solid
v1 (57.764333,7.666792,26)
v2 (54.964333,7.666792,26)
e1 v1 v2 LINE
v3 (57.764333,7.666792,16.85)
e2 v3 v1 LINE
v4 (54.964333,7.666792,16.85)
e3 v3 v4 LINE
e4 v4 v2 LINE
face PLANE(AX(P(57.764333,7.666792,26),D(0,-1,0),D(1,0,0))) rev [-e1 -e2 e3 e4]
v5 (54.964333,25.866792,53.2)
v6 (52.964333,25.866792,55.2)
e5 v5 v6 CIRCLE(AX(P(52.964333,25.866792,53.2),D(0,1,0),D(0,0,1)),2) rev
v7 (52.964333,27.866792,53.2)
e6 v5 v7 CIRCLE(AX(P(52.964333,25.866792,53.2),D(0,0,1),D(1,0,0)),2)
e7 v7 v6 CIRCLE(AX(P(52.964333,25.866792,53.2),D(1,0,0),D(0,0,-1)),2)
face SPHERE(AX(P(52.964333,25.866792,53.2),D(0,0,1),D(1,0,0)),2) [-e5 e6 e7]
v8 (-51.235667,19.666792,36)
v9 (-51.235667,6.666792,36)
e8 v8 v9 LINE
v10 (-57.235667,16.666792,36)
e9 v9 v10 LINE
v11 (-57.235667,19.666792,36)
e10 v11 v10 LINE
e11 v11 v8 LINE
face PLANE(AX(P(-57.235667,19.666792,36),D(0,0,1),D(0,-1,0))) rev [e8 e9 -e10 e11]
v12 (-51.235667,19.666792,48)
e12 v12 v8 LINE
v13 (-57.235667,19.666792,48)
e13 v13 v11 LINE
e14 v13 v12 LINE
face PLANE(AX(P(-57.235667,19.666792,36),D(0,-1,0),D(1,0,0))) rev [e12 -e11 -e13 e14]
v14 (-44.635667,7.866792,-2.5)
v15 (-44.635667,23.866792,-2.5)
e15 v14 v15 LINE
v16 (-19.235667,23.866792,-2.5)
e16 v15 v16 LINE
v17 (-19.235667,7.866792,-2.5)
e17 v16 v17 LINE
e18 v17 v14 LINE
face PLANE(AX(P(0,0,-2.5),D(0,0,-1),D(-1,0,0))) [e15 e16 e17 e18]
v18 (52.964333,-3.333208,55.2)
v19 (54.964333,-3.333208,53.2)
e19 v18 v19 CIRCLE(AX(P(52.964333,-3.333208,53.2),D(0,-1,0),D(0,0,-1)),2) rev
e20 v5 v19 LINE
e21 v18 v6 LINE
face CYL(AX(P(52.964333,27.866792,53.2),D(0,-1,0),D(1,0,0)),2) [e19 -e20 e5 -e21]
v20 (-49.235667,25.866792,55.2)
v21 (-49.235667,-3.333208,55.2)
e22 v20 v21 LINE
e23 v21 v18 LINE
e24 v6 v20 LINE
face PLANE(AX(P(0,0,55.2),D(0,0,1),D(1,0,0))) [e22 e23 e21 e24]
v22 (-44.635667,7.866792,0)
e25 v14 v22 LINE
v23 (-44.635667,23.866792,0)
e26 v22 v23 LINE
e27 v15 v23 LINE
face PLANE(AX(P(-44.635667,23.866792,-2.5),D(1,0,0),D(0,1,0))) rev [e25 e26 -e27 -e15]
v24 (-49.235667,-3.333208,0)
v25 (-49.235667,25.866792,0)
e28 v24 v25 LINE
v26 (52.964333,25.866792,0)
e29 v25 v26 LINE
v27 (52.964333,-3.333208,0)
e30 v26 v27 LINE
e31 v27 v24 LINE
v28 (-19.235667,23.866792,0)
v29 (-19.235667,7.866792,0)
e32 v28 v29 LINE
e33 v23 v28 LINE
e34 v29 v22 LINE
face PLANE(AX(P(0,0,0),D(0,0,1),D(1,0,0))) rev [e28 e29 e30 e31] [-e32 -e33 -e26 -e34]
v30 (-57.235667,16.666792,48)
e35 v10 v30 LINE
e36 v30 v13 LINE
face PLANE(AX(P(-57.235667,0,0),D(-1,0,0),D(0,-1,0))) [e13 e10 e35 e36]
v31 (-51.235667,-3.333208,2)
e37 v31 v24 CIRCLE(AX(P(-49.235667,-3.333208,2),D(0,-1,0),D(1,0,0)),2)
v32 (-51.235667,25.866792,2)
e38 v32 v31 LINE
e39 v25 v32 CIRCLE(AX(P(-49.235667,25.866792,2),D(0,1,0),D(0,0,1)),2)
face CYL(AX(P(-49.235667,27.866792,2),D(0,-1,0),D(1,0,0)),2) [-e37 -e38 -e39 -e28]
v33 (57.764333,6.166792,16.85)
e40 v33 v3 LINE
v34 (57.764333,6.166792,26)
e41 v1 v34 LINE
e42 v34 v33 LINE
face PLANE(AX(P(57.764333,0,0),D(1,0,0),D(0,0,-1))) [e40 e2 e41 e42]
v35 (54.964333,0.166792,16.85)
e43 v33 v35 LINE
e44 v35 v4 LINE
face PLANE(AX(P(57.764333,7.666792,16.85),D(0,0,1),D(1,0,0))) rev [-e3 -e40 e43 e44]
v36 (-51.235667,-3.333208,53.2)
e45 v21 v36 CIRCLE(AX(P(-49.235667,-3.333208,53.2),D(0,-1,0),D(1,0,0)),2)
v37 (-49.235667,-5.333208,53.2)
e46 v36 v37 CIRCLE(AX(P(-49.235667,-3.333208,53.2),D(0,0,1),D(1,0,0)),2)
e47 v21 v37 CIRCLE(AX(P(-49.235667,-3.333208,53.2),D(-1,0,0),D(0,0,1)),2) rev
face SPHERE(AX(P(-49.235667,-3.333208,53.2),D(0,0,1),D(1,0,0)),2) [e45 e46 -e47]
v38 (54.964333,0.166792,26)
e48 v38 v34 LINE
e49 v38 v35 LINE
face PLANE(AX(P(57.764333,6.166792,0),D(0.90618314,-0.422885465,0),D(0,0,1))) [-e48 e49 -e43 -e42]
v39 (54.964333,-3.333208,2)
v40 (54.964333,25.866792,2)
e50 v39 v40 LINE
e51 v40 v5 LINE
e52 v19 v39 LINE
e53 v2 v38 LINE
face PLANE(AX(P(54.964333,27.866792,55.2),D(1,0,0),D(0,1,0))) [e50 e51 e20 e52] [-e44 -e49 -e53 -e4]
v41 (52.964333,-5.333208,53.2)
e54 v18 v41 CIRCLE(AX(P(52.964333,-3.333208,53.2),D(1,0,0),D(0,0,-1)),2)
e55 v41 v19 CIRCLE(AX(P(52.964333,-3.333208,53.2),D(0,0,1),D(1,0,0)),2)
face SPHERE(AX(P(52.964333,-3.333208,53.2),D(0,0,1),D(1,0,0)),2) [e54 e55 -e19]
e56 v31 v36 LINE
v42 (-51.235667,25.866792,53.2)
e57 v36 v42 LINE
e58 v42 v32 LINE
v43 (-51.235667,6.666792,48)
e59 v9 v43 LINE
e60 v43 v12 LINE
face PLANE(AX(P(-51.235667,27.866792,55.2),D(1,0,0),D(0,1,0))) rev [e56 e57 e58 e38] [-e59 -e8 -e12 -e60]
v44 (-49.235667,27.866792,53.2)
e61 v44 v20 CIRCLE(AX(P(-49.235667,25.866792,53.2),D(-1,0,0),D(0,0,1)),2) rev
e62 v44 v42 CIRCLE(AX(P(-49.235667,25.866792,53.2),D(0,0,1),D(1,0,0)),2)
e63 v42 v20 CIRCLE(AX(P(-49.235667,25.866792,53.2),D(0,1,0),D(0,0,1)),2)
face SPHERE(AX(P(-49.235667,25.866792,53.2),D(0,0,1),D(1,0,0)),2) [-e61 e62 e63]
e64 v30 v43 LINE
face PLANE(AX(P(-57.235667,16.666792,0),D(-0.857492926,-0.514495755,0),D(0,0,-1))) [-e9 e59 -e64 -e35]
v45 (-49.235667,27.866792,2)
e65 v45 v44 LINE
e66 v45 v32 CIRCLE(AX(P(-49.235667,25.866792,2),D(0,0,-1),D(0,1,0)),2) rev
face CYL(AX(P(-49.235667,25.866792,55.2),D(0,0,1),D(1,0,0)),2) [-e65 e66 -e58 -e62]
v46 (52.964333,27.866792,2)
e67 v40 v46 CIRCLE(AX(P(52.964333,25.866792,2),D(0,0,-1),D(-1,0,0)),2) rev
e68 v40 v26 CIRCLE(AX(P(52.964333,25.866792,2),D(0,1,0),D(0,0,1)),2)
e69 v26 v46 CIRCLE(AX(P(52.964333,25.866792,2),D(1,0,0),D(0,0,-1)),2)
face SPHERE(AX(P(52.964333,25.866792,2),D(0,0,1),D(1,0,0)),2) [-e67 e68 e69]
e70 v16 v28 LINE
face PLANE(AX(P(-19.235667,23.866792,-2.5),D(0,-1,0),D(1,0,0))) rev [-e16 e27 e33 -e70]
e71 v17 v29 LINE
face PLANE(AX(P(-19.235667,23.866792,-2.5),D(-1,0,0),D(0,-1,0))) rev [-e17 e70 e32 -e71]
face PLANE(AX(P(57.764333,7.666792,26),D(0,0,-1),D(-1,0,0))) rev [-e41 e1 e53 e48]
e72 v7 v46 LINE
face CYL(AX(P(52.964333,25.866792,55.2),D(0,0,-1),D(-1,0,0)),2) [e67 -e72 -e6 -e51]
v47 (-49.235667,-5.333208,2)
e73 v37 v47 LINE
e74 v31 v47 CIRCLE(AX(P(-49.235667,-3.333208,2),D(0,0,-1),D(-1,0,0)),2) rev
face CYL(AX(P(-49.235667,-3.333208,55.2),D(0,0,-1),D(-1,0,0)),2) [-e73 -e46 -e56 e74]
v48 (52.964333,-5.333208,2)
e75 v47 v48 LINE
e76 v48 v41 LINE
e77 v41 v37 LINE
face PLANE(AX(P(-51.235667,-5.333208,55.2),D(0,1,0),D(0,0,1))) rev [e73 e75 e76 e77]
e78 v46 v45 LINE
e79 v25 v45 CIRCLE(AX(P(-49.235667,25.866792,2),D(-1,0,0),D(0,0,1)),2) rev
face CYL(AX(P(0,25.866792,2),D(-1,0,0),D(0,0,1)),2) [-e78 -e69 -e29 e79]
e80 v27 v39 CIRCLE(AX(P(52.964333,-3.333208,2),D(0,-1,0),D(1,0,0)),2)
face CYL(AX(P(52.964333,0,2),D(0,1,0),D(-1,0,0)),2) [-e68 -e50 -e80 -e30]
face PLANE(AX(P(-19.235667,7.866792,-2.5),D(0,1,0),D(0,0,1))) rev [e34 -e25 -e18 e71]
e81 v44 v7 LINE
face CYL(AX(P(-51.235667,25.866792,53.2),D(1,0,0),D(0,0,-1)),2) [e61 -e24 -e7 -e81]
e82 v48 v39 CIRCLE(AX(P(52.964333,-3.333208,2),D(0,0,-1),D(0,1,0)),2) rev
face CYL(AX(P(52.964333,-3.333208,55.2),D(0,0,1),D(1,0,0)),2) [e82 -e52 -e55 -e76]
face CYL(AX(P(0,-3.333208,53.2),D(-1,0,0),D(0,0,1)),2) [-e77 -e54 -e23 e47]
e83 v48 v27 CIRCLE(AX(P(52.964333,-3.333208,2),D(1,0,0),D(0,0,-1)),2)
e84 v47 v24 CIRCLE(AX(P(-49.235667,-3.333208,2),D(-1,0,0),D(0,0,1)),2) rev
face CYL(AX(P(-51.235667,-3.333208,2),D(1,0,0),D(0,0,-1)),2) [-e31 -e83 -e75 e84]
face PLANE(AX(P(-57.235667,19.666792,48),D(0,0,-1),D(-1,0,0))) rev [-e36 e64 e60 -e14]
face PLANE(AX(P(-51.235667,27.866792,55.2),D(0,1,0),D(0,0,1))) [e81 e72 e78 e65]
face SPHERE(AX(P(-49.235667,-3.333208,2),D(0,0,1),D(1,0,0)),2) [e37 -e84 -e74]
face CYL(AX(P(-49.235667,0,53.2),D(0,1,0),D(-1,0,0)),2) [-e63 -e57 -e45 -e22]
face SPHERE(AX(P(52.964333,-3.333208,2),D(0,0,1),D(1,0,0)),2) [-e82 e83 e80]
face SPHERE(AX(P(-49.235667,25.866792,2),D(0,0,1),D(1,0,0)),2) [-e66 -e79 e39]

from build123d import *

# Parameters (mm, degrees)
SCHIZZO1_W                   = 106.2
SCHIZZO1_H                   = 33.2
ESTRUSIONE_ESTRUSIONE1_DEPTH = 55.2
RACCORDO1_R                  = 2
SCHIZZO2_W                   = 12
SCHIZZO2_H                   = 13
ESTRUSIONE_ESTRUSIONE2_DEPTH = 6
SMUSSO1_SIZE2                = 10
SMUSSO1_SIZE                 = 6
SCHIZZO4_W                   = 9.15
SCHIZZO4_H                   = 7.5
ESTRUSIONE_ESTRUSIONE3_DEPTH = 2.8
SMUSSO2_SIZE2                = 6
SMUSSO2_SIZE                 = 2.8
SCHIZZO5_W                   = 25.4
SCHIZZO5_H                   = 16
ESTRUSIONE_ESTRUSIONE4_DEPTH = 2.5


with BuildPart() as part:
    # Schizzo1 → Estrusione-Estrusione1 (new body)
    with BuildSketch(Plane.XY):
        with Locations((1.864332707, 11.26679198)):
            Rectangle(SCHIZZO1_W, SCHIZZO1_H)
    extrude(amount=ESTRUSIONE_ESTRUSIONE1_DEPTH)

    # Raccordo1
    raccordo1_edges = [part.edges().sort_by_distance(p)[0] for p in [
        (54.964332707, 11.26679198, 55.2),
        (1.864332707, 27.86679198, 55.2),
        (-51.235667293, 11.26679198, 55.2),
        (1.864332707, 27.86679198, 0),
        (54.964332707, 11.26679198, 0),
        (1.864332707, -5.33320802, 0),
        (-51.235667293, 11.26679198, 0),
        (1.864332707, -5.33320802, 55.2),
        (-51.235667293, 27.86679198, 27.6),
        (54.964332707, 27.86679198, 27.6),
        (54.964332707, -5.33320802, 27.6),
        (-51.235667293, -5.33320802, 27.6),
    ]]
    fillet(raccordo1_edges, radius=RACCORDO1_R)

    # Schizzo2 → Estrusione-Estrusione2 (add)
    with BuildSketch(Plane.ZY.offset(51.235667293)):
        with Locations((42, 13.16679198)):
            Rectangle(SCHIZZO2_W, SCHIZZO2_H)
    extrude(amount=ESTRUSIONE_ESTRUSIONE2_DEPTH)

    # Smusso1
    smusso1_edges = [part.edges().sort_by_distance(p)[0] for p in [
        (-57.235667293, 6.66679198, 42),
    ]]
    smusso1_side = [part.faces().sort_by_distance(p)[0] for p in [
        (-57.115667293, 6.66679198, 42),
    ]]
    chamfer(smusso1_edges, length=SMUSSO1_SIZE - 0.0001, length2=SMUSSO1_SIZE2 - 0.0001, reference=smusso1_side[0])  # a hair under: the kernel refuses the full size

    # Schizzo4 → Estrusione-Estrusione3 (add)
    with BuildSketch(Plane(origin=(54.964332707, 0, 0), x_dir=(0, 0, -1), z_dir=(1, 0, 0))):
        with Locations((-21.425, 3.91679198)):
            Rectangle(SCHIZZO4_W, SCHIZZO4_H)
    extrude(amount=ESTRUSIONE_ESTRUSIONE3_DEPTH)

    # Smusso2
    smusso2_edges = [part.edges().sort_by_distance(p)[0] for p in [
        (57.764332707, 0.16679198, 21.425),
    ]]
    smusso2_side = [part.faces().sort_by_distance(p)[0] for p in [
        (57.708332707, 0.16679198, 21.425),
    ]]
    chamfer(smusso2_edges, length=SMUSSO2_SIZE - 0.0001, length2=SMUSSO2_SIZE2 - 0.0001, reference=smusso2_side[0])  # a hair under: the kernel refuses the full size

    # Schizzo5 → Estrusione-Estrusione4 (add)
    with BuildSketch(Plane(origin=(0, 0, 0), x_dir=(-1, 0, 0), z_dir=(0, 0, -1))):
        with Locations((31.935667293, 15.86679198)):
            Rectangle(SCHIZZO5_W, SCHIZZO5_H)
    extrude(amount=ESTRUSIONE_ESTRUSIONE4_DEPTH)


solid = part.part
